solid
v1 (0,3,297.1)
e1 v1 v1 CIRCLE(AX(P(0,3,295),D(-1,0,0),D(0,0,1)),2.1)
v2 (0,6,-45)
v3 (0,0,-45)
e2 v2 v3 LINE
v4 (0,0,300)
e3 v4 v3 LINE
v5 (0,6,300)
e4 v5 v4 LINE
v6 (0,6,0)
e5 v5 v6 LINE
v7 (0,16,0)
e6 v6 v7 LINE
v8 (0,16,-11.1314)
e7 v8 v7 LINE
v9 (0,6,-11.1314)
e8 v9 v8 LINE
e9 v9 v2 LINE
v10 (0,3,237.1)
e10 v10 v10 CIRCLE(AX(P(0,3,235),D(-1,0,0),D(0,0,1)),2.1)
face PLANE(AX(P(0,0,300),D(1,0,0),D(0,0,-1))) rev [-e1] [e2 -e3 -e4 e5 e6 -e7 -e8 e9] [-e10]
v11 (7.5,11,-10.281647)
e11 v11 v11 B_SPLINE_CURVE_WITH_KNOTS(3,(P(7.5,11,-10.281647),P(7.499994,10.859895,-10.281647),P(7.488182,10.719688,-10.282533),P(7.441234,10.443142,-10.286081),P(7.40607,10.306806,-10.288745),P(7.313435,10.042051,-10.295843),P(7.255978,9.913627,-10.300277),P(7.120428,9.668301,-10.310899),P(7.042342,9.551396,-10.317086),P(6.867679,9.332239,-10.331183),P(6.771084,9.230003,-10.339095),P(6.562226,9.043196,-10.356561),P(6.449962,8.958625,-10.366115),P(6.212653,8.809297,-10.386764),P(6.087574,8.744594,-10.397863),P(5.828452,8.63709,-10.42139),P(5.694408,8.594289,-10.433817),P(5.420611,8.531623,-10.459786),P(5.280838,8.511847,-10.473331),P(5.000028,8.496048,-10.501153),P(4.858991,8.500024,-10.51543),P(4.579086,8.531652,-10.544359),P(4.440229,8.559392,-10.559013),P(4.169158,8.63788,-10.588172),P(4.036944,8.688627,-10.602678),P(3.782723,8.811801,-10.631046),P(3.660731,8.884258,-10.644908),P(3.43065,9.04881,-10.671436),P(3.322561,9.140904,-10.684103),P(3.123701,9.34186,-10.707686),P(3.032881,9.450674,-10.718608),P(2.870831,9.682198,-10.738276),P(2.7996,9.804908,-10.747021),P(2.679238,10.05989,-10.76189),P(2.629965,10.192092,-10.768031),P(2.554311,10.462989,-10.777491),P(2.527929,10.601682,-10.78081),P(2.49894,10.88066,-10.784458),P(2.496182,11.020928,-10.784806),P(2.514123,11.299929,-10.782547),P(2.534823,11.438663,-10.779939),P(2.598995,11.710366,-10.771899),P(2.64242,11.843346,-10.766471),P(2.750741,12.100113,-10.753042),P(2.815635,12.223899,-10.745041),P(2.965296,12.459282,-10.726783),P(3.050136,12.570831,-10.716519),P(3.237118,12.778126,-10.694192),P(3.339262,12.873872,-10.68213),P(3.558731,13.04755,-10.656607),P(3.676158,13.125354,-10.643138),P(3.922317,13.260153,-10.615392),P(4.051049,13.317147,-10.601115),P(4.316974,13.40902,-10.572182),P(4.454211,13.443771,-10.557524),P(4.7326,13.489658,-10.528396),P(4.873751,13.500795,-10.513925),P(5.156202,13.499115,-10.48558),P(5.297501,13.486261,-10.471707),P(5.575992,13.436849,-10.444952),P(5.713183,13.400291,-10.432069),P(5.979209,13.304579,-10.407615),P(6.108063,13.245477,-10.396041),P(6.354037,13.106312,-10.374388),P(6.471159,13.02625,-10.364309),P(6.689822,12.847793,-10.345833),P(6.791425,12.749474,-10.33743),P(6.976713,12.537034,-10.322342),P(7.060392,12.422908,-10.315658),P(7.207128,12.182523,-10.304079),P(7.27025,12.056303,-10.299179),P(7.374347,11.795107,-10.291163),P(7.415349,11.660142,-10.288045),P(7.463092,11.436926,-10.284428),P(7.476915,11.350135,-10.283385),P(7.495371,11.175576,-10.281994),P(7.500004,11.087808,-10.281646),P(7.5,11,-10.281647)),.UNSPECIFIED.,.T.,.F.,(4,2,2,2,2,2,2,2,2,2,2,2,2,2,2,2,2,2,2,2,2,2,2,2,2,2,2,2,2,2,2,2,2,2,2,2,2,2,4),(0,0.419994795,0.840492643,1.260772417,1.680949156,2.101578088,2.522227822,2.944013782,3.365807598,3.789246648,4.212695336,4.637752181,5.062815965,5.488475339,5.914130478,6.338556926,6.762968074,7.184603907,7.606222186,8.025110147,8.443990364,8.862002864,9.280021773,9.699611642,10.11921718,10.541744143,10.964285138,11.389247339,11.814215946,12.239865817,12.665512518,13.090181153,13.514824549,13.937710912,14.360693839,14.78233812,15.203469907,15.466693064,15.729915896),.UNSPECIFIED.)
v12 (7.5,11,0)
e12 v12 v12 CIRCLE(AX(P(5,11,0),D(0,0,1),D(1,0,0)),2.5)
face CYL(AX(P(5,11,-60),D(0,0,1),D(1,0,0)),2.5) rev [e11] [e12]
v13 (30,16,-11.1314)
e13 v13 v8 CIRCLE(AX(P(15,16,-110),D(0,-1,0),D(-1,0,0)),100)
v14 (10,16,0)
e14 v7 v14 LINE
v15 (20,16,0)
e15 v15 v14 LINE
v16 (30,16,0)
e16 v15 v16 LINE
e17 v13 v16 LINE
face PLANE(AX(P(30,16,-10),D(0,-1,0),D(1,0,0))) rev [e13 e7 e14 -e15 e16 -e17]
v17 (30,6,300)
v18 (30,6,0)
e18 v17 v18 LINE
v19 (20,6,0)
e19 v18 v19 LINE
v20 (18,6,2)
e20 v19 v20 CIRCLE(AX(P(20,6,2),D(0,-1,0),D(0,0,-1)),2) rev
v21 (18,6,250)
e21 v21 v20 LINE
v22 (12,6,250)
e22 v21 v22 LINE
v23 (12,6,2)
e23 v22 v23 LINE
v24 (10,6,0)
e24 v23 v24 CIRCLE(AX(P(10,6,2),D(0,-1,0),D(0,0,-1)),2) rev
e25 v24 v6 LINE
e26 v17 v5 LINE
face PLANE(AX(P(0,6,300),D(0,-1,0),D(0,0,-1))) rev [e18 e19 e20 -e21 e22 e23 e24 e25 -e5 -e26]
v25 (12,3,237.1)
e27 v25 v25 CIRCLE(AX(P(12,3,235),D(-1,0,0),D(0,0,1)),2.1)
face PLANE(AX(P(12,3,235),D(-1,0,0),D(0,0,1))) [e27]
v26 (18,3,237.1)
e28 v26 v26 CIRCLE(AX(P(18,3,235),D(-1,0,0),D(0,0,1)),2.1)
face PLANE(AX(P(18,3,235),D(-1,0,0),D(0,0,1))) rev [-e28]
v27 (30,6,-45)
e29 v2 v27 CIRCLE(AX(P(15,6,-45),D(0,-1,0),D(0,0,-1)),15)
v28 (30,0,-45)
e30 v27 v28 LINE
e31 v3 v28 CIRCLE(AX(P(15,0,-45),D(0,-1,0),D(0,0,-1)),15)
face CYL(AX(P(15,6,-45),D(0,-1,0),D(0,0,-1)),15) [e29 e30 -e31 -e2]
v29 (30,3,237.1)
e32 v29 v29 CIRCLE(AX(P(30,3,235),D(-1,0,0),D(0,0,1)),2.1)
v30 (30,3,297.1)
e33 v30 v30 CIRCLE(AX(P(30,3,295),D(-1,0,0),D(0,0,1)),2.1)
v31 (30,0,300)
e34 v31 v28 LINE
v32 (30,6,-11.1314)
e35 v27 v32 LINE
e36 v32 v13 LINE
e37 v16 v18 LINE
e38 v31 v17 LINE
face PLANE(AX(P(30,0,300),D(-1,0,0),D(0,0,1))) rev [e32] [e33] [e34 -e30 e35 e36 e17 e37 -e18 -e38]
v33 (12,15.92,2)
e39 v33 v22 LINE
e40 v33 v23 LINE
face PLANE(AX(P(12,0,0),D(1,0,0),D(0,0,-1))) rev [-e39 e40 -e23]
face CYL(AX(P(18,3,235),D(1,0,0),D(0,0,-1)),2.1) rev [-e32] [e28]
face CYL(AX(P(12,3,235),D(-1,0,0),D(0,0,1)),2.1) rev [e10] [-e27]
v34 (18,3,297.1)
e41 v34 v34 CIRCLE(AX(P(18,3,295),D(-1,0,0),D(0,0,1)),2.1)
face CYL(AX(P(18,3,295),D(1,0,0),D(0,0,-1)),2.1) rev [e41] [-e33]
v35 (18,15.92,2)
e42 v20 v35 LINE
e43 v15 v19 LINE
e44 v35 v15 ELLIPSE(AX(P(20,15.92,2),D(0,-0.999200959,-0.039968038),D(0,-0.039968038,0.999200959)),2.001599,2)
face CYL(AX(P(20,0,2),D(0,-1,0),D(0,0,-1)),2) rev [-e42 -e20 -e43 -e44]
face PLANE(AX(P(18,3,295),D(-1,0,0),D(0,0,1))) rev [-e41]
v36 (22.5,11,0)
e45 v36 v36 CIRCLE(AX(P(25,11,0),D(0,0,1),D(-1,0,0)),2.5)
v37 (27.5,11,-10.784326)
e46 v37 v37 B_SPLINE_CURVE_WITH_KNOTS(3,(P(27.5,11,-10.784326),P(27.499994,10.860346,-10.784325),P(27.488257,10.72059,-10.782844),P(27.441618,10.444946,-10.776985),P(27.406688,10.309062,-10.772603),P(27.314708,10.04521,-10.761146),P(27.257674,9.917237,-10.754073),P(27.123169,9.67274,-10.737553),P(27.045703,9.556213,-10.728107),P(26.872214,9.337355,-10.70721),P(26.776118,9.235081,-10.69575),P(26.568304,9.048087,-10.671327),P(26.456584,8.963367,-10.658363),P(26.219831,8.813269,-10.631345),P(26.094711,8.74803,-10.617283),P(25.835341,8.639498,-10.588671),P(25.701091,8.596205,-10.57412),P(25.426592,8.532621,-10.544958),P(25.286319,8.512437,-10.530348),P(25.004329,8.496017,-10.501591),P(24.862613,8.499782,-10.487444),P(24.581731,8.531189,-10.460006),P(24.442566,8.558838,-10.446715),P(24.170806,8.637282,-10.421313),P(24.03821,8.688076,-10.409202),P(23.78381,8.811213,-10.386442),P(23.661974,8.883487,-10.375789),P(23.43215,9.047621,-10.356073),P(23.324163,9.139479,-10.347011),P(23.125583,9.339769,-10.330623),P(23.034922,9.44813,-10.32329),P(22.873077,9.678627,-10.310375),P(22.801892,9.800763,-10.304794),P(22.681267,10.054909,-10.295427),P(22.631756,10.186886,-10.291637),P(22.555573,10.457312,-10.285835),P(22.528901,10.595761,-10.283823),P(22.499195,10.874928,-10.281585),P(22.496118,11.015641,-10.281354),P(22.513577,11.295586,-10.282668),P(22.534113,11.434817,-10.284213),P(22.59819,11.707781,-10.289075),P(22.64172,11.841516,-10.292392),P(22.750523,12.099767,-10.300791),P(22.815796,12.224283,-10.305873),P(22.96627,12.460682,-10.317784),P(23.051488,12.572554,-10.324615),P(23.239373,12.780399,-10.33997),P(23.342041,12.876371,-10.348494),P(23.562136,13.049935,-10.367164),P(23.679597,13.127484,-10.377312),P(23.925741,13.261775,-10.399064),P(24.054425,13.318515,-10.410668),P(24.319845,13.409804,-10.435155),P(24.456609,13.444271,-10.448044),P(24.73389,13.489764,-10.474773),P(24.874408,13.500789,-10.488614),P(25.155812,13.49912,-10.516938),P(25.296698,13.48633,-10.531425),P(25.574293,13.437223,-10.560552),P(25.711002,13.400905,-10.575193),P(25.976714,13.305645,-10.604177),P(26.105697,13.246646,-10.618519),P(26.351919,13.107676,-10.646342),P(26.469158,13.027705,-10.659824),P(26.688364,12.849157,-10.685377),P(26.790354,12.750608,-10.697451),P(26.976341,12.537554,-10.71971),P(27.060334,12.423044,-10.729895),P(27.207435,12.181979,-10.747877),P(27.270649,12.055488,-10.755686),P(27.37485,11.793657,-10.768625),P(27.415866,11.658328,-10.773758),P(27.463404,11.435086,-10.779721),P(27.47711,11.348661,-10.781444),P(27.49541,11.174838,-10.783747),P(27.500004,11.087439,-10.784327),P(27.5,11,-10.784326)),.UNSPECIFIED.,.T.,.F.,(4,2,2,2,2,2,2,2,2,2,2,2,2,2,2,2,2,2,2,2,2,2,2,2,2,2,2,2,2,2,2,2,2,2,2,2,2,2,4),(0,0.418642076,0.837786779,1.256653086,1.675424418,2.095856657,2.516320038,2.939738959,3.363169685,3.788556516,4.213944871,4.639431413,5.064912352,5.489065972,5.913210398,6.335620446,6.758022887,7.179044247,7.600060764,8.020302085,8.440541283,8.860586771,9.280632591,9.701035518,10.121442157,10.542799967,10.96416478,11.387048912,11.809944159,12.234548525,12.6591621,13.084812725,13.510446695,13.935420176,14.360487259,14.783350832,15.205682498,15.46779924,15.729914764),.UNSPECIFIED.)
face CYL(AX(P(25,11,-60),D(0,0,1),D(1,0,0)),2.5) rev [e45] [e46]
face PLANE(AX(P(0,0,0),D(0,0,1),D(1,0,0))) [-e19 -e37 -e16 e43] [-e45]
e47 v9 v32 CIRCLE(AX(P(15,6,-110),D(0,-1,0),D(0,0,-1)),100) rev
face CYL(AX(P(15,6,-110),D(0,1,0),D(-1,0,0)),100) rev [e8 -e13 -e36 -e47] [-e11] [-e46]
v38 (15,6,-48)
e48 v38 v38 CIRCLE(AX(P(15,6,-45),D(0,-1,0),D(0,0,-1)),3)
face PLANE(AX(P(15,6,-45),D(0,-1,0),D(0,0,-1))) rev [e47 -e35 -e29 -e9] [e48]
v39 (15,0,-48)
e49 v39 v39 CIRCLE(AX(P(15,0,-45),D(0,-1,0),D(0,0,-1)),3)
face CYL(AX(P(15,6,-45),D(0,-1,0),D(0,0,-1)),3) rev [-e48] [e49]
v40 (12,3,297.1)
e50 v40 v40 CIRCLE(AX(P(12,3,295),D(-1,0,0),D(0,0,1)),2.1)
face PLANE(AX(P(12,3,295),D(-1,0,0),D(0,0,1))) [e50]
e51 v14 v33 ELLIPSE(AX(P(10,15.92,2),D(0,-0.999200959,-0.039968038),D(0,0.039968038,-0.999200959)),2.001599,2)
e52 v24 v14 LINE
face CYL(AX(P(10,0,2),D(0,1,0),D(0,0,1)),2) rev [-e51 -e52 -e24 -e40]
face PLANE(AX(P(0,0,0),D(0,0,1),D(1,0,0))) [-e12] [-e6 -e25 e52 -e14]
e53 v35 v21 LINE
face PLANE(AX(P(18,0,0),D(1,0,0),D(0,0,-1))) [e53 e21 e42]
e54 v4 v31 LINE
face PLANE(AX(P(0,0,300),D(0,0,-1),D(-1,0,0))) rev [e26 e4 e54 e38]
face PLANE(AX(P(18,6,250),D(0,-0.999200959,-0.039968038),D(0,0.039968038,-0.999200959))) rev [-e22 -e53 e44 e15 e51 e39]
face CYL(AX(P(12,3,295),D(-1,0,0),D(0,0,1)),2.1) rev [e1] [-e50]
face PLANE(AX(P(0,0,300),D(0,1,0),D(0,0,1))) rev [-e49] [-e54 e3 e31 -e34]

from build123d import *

# Parameters (mm, degrees)
ESQUISSE1_W             = 30
ESQUISSE1_H             = 6
BOSS_EXTRU_1_DEPTH      = 300
BOSS_EXTRU_2_DEPTH      = 3
BOSS_EXTRU_2_DEPTH_BACK = 3
ESQUISSE4_W             = 30
ESQUISSE4_H             = 16
BOSS_EXTRU_3_DEPTH      = 10
ESQUISSE7_R             = 3
BOSS_EXTRU_5_DEPTH      = 6
ESQUISSE8_R             = 2.1
ENL_V_MAT_EXTRU_1_DEPTH = 12
ENL_V_START             = -18
ESQUISSE8_2_R           = 2.1
ENL_V_MAT_EXTRU_3_DEPTH = 12
BOSS_EXTRU_6_DEPTH      = 16
ESQUISSE10_R            = 2.5
ENL_V_MAT_EXTRU_4_DEPTH = 302.920519342
CONG_1_R                = 2


with BuildPart() as part:
    # Esquisse1 → Boss.-Extru.1 (new body)
    with BuildSketch(Plane.XY):
        with Locations((15, 3)):
            Rectangle(ESQUISSE1_W, ESQUISSE1_H)
    extrude(amount=BOSS_EXTRU_1_DEPTH)

    # Esquisse3 → Boss.-Extru.2 (add, two sides: drawn at the far end of the back side and taken through both)
    with BuildSketch(Plane(origin=(15, 0, 0), x_dir=(0, 0, -1), z_dir=(1, 0, 0)).offset(-BOSS_EXTRU_2_DEPTH_BACK)):
        Polygon((-250, 6), (0, 16), (0, 6), align=None)
    extrude(amount=BOSS_EXTRU_2_DEPTH + BOSS_EXTRU_2_DEPTH_BACK)

    # Esquisse4 → Boss.-Extru.3 (add)
    with BuildSketch(Plane(origin=(0, 0, 0), x_dir=(-1, 0, 0), z_dir=(0, 0, -1))):
        with Locations((-15, 8)):
            Rectangle(ESQUISSE4_W, ESQUISSE4_H)
    extrude(amount=BOSS_EXTRU_3_DEPTH)

    # Esquisse7 → Boss.-Extru.5 (add)
    with BuildSketch(Plane.XZ):
        with BuildLine():
            Line((0, -10), (0, -45))
            ThreePointArc((0, -45), (15, -60), (30, -45))
            Line((30, -45), (30, -10))
            Line((30, -10), (0, -10))
        make_face()
        with Locations(Location((15, -45, 0), (0, 0, 270))):
            Circle(ESQUISSE7_R, mode=Mode.SUBTRACT)
    extrude(amount=-BOSS_EXTRU_5_DEPTH)

    # Esquisse8 → Enlèv. mat.-Extru.1 (cut)
    with BuildSketch(Plane.ZY):
        with Locations((295, 3)):
            Circle(ESQUISSE8_R)
        with Locations((235, 3)):
            Circle(ESQUISSE8_R)
    extrude(amount=-ENL_V_MAT_EXTRU_1_DEPTH, mode=Mode.SUBTRACT)

    # Esquisse8<2> → Enlèv. mat.-Extru.3 (cut)
    with BuildSketch(Plane.ZY.offset(ENL_V_START)):
        with Locations((295, 3)):
            Circle(ESQUISSE8_2_R)
        with Locations((235, 3)):
            Circle(ESQUISSE8_2_R)
    extrude(amount=-ENL_V_MAT_EXTRU_3_DEPTH, mode=Mode.SUBTRACT)

    # Esquisse9 → Boss.-Extru.6 (add)
    with BuildSketch(Plane(origin=(0, 16, 0), x_dir=(1, 0, 0), z_dir=(0, 1, 0))):
        with BuildLine():
            Line((0, 11.131400334), (0, 0))
            Line((0, 0), (30, 0))
            Line((30, 0), (30, 11.131400334))
            ThreePointArc((30, 11.131400334), (15, 10), (0, 11.131400334))
        make_face()
    extrude(amount=-BOSS_EXTRU_6_DEPTH)

    # Esquisse10 → Enlèv. mat.-Extru.4 (cut, through all)
    with BuildSketch(Plane.XY):
        with Locations((5, 11)):
            Circle(ESQUISSE10_R)
        with Locations((25, 11)):
            Circle(ESQUISSE10_R)
    extrude(amount=-ENL_V_MAT_EXTRU_4_DEPTH, mode=Mode.SUBTRACT)

    # Congé1
    # the kernel refuses this fillet: 2 mm, written as the material it adds along each edge
    with BuildSketch(Plane(origin=(12, 16, 0), x_dir=(-1, 0, 0), z_dir=(0, -1, 0))) as cong_1_piece_1_section:
        with BuildLine():
            CenterArc((CONG_1_R, -CONG_1_R), CONG_1_R, 90, 90)
            Line((0, -CONG_1_R), (0, 0))
            Line((0, 0), (CONG_1_R, 0))
        make_face()
    cong_1_piece_1 = extrude(amount=15, mode=Mode.PRIVATE)
    cong_1_piece_1 = split(cong_1_piece_1, bisect_by=Plane(origin=(11.546773045, 15.973945238, 0.651369053), z_dir=(0, -0.9992009587217895, -0.03996803834887158)), keep=Keep.TOP, mode=Mode.PRIVATE)
    add(cong_1_piece_1)
    with BuildSketch(Plane(origin=(18, 16, 0), x_dir=(1, 0, 0), z_dir=(0, -1, 0))) as cong_1_piece_2_section:
        with BuildLine():
            CenterArc((CONG_1_R, CONG_1_R), CONG_1_R, 180, 90)
            Line((0, CONG_1_R), (0, 0))
            Line((0, 0), (CONG_1_R, 0))
        make_face()
    cong_1_piece_2 = extrude(amount=15, mode=Mode.PRIVATE)
    cong_1_piece_2 = split(cong_1_piece_2, bisect_by=Plane(origin=(18.453226955, 15.973945238, 0.651369053), z_dir=(0, -0.9992009587217895, -0.03996803834887158)), keep=Keep.TOP, mode=Mode.PRIVATE)
    add(cong_1_piece_2)


solid = part.part
